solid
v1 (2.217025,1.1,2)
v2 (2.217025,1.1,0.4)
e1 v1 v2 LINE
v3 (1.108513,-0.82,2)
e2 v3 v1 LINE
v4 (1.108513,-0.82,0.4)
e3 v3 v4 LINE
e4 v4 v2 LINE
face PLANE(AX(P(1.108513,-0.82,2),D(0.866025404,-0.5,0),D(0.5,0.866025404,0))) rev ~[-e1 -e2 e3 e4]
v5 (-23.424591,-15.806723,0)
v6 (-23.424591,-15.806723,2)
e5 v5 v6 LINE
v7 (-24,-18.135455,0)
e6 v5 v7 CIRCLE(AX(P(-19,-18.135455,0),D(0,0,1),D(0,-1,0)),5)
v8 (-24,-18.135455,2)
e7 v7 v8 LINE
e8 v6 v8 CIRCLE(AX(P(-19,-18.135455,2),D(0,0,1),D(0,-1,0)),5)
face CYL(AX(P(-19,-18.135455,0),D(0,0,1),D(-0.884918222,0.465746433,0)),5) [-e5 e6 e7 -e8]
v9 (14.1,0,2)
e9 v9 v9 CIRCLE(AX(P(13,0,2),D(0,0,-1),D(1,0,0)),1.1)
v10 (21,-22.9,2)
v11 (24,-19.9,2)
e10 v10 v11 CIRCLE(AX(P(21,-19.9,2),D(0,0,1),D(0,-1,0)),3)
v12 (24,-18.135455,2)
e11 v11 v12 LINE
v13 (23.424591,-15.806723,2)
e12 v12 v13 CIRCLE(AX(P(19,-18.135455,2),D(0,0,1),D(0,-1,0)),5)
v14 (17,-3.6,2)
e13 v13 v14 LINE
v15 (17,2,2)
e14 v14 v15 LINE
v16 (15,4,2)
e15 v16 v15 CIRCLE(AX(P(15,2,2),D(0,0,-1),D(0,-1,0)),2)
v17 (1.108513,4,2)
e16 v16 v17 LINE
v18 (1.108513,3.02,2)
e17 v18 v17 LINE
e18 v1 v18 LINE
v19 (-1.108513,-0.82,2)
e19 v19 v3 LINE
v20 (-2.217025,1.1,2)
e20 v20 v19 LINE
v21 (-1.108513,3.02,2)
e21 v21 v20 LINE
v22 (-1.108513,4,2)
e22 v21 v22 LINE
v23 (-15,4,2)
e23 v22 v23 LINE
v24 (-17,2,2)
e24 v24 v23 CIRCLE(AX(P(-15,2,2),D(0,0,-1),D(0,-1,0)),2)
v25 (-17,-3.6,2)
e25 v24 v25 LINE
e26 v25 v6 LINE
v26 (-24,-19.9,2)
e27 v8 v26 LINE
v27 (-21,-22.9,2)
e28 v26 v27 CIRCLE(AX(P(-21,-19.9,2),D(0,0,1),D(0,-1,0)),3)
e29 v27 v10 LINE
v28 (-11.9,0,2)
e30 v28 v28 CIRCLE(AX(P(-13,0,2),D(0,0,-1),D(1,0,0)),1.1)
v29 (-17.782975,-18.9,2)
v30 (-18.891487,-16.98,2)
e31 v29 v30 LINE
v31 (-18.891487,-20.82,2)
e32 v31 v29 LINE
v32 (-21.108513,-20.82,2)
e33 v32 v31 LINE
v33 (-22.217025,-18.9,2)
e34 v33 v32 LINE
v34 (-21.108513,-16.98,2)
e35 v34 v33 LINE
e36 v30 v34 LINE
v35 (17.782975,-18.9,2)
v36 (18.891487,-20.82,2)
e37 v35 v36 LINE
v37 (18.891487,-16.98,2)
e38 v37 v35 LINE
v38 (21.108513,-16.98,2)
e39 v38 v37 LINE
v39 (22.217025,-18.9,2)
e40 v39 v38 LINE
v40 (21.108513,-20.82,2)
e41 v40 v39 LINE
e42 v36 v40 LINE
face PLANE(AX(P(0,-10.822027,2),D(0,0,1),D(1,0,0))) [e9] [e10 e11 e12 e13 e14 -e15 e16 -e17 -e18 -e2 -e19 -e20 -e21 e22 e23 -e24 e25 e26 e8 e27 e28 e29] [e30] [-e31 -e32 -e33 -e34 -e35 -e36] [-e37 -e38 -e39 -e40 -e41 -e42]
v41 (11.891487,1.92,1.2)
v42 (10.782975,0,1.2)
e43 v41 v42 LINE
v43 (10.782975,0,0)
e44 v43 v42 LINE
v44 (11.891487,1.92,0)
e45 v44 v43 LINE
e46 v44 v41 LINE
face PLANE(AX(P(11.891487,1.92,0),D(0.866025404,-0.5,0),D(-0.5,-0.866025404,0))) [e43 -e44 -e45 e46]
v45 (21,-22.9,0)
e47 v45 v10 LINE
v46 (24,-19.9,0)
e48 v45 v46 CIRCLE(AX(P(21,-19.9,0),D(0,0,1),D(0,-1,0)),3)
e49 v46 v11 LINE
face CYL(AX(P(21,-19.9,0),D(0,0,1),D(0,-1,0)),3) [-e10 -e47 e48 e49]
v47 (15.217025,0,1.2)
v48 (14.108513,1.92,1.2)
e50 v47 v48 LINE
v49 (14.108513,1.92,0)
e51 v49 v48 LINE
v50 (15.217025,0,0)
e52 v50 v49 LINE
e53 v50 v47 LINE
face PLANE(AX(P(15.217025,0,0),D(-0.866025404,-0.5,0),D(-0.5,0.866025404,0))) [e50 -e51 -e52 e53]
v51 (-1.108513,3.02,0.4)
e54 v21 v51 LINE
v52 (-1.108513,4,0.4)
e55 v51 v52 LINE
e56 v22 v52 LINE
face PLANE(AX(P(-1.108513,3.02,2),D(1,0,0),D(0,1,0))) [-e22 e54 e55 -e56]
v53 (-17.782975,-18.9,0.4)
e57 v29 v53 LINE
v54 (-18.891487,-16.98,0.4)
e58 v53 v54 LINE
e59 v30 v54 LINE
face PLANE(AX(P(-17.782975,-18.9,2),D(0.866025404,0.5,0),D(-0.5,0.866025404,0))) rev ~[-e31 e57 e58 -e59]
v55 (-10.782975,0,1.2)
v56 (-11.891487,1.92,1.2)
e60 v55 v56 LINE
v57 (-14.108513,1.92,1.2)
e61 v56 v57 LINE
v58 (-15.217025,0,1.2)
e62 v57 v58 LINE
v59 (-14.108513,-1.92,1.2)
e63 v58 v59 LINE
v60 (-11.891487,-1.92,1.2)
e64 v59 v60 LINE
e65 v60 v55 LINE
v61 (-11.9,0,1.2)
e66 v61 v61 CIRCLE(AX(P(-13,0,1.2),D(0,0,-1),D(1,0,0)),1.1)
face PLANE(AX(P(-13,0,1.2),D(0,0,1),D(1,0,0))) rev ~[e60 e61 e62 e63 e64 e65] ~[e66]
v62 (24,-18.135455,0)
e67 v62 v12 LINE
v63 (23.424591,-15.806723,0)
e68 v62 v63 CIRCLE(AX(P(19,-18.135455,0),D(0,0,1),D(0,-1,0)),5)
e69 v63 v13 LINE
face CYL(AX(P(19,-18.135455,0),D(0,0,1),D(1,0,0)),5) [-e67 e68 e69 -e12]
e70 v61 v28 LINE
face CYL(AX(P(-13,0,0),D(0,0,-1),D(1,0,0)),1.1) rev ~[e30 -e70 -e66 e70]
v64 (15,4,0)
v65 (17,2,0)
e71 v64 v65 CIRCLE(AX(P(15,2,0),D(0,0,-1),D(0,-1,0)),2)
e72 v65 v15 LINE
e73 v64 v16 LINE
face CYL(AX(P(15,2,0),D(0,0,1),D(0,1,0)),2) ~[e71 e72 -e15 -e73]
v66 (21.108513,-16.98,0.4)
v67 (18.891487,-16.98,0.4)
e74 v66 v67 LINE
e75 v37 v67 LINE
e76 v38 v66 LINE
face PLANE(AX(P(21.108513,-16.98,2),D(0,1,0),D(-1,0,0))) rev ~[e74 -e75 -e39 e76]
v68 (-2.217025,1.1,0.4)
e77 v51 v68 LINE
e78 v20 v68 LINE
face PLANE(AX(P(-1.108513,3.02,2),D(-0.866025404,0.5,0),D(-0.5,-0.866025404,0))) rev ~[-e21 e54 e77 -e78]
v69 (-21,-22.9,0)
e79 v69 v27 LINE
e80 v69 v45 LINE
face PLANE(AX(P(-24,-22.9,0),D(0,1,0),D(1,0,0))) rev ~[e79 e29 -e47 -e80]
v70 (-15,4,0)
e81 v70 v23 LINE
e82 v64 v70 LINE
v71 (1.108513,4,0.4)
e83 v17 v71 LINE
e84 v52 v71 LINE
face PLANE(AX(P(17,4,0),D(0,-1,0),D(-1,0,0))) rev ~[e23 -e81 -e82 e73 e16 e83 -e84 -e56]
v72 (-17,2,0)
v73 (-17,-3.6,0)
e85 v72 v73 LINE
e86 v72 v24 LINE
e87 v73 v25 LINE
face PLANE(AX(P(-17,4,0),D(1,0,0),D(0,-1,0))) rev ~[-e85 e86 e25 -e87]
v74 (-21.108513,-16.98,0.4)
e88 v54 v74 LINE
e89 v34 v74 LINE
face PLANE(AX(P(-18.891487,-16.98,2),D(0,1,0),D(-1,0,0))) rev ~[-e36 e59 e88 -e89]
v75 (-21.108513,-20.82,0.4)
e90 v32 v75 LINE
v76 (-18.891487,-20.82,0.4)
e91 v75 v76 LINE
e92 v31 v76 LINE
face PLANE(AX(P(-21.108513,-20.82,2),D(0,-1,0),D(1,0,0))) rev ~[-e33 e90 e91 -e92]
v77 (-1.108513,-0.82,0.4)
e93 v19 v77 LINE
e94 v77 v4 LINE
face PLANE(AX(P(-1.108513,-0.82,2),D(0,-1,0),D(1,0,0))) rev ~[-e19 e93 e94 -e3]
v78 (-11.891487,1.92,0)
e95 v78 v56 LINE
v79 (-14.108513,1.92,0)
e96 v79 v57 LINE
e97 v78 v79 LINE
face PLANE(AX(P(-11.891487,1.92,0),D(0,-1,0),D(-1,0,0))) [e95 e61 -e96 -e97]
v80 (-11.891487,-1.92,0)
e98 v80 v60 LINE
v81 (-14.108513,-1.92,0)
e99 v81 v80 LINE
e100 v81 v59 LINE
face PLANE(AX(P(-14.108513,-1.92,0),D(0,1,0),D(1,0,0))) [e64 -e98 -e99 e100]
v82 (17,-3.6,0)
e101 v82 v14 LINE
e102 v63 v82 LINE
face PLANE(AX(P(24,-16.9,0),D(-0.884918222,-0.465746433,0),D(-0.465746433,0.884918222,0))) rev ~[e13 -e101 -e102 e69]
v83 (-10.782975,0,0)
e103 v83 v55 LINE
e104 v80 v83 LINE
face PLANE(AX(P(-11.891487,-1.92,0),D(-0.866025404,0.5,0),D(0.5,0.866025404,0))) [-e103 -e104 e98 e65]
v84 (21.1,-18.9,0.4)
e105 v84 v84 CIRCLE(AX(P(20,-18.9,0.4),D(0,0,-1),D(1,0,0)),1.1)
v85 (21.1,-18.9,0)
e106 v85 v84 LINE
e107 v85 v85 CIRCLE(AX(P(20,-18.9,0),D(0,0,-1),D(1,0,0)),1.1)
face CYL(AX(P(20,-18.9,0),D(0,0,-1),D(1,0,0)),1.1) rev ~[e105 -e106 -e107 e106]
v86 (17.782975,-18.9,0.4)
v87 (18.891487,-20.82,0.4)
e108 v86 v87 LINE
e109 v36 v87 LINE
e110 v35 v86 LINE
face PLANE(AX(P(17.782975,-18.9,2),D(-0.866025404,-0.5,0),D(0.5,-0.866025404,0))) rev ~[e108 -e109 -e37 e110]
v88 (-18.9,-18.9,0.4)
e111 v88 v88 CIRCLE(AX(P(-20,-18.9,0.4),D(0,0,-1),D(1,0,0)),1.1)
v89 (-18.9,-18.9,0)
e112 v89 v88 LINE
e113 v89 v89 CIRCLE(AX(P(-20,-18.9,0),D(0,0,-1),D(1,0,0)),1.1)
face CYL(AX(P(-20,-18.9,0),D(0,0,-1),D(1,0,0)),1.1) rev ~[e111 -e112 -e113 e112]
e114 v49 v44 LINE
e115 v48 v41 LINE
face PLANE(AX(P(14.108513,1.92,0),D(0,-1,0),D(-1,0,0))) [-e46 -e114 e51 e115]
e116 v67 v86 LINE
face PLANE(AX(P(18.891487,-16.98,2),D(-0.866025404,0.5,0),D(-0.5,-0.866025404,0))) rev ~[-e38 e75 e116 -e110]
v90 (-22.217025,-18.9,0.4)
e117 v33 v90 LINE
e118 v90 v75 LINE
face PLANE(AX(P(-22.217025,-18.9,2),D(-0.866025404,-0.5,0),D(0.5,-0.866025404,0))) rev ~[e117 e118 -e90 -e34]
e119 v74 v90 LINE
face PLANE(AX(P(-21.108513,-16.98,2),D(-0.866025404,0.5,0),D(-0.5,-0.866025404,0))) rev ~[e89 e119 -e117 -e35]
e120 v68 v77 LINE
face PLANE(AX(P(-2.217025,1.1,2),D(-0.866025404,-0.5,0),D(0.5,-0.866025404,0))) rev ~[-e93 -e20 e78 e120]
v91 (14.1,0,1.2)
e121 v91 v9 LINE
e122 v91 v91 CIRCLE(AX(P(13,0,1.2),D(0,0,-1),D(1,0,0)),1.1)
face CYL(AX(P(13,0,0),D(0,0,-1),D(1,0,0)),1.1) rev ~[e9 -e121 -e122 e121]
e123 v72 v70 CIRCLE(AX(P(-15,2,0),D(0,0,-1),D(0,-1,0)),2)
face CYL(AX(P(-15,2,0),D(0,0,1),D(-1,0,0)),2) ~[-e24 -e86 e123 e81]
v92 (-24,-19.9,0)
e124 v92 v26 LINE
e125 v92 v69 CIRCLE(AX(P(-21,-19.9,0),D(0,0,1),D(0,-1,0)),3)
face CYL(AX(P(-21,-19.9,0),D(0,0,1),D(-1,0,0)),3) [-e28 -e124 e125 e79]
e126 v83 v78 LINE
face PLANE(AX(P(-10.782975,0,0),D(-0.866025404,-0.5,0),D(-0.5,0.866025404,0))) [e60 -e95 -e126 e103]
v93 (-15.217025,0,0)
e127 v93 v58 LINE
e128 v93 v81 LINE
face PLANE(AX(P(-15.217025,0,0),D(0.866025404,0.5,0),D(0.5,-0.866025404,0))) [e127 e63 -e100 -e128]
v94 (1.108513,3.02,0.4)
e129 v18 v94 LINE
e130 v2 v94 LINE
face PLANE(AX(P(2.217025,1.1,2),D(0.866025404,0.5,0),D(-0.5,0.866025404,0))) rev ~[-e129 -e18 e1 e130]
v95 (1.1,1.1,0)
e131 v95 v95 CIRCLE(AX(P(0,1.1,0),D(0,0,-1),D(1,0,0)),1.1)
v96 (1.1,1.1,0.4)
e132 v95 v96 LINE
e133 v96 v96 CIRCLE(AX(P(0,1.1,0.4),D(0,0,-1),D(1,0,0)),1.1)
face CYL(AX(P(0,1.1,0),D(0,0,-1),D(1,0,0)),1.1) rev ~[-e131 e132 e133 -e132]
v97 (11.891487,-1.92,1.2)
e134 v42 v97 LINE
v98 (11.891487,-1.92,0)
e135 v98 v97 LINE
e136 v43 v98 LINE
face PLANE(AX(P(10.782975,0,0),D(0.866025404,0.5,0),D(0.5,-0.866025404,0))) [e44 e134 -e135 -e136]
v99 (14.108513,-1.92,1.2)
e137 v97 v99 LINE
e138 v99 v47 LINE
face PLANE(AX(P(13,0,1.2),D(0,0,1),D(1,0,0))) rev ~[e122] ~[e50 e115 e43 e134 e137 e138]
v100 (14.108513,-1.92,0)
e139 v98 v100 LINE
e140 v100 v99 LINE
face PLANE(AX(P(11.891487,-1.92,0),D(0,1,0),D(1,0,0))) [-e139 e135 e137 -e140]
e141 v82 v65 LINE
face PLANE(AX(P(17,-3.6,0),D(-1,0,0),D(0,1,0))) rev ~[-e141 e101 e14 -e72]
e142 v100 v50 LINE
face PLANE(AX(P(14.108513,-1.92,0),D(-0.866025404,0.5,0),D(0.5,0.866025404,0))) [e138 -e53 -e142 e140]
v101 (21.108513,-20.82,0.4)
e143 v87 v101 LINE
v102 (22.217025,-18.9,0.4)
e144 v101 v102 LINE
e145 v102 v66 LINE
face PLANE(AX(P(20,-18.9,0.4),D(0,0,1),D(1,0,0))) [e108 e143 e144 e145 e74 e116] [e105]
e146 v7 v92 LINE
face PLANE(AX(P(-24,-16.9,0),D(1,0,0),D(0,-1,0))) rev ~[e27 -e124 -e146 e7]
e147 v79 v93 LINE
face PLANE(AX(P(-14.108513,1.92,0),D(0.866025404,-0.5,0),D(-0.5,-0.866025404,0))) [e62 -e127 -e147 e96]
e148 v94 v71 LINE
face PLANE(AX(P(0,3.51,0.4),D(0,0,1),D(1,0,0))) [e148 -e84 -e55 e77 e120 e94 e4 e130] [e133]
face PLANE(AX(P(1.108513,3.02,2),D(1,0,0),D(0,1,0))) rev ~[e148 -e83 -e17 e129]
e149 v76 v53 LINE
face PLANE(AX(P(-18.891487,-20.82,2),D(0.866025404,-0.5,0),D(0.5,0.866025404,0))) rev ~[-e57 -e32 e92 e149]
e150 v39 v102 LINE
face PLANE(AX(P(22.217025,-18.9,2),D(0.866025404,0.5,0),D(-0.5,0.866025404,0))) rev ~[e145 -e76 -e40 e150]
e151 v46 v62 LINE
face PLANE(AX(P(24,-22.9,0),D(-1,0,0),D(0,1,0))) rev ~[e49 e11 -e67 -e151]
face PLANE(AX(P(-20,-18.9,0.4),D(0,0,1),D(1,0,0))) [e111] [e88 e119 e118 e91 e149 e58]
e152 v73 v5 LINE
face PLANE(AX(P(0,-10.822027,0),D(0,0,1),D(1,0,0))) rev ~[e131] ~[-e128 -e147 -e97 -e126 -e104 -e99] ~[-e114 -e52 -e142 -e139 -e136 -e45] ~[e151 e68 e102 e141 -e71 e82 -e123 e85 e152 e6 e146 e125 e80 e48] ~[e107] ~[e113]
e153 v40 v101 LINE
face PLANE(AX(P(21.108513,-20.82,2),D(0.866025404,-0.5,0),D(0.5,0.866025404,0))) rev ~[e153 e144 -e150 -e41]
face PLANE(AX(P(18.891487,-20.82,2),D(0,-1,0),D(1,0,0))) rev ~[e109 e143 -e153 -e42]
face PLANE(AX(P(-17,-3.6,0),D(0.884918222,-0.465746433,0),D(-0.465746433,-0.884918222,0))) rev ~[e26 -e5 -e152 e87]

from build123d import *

# Parameters (mm, degrees)
F2_DEPTH = 2
F3_R     = 1.1
F4_DEPTH = 2
F6_DEPTH = 1.2
F7_W     = 2.2170250337
F7_H     = 0.98
F8_DEPTH = 1.6
F9_R     = 2
F10_R    = 5
F11_R    = 3


with BuildPart() as f2:
    # F1 (on Top) → F2 (new body)
    with BuildSketch(Plane.XY):
        Polygon((0, 4), (-3, 4), (-13, 4), (-17, 4), (-17, -3.6), (-24, -16.9), (-24, -22.9), (0, -22.9), (24, -22.9), (24, -16.9), (17, -3.6), (17, 4), (13, 4), (3, 4), align=None)
    extrude(amount=F2_DEPTH)

    # F3 (on face) → F4 (cut, through all)
    with BuildSketch(Plane(origin=(0, 0, 0), x_dir=(1, 0, 0), z_dir=(0, 0, -1))):
        with Locations((20, 18.9)):
            Circle(F3_R)
        with Locations((13, 0)):
            Circle(F3_R)
        with Locations((0, -1.1)):
            Circle(F3_R)
        with Locations((-13, 0)):
            Circle(F3_R)
        with Locations((-20, 18.9)):
            Circle(F3_R)
    extrude(amount=-F4_DEPTH, mode=Mode.SUBTRACT)

    # F5 (on Top) → F6 (cut)
    with BuildSketch(Plane.XY):
        Polygon((10.7829749663, 0), (11.8914874832, -1.92), (14.1085125168, -1.92), (15.2170250337, 0), (14.1085125168, 1.92), (11.8914874832, 1.92), align=None)
        Polygon((-14.1085125168, -1.92), (-11.8914874832, -1.92), (-10.7829749663, 0), (-11.8914874832, 1.92), (-14.1085125168, 1.92), (-15.2170250337, 0), align=None)
    extrude(amount=F6_DEPTH, mode=Mode.SUBTRACT)

    # F7 (on face) → F8 (cut)
    with BuildSketch(Plane.XY.offset(2)):
        Polygon((-17.7829749663, -18.9), (-18.8914874832, -16.98), (-21.1085125168, -16.98), (-22.2170250337, -18.9), (-21.1085125168, -20.82), (-18.8914874832, -20.82), align=None)
        with Locations((0, 3.51)):
            Rectangle(F7_W, F7_H)
        Polygon((1.1085125168, 3.02), (-1.1085125168, 3.02), (-2.2170250337, 1.1), (-1.1085125168, -0.82), (1.1085125168, -0.82), (2.2170250337, 1.1), align=None)
        Polygon((18.8914874832, -16.98), (17.7829749663, -18.9), (18.8914874832, -20.82), (21.1085125168, -20.82), (22.2170250337, -18.9), (21.1085125168, -16.98), align=None)
    extrude(amount=-F8_DEPTH, mode=Mode.SUBTRACT)

    # F9
    f9_edges = [f2.edges().sort_by_distance(p)[0] for p in [
        (-17, 4, 1),
        (17, 4, 1),
    ]]
    fillet(f9_edges, radius=F9_R)

    # F10
    f10_edges = [f2.edges().sort_by_distance(p)[0] for p in [
        (24, -16.9, 1),
        (-24, -16.9, 1),
    ]]
    fillet(f10_edges, radius=F10_R)

    # F11
    f11_edges = [f2.edges().sort_by_distance(p)[0] for p in [
        (24, -22.9, 1),
        (-24, -22.9, 1),
    ]]
    fillet(f11_edges, radius=F11_R)


solid = f2.part
